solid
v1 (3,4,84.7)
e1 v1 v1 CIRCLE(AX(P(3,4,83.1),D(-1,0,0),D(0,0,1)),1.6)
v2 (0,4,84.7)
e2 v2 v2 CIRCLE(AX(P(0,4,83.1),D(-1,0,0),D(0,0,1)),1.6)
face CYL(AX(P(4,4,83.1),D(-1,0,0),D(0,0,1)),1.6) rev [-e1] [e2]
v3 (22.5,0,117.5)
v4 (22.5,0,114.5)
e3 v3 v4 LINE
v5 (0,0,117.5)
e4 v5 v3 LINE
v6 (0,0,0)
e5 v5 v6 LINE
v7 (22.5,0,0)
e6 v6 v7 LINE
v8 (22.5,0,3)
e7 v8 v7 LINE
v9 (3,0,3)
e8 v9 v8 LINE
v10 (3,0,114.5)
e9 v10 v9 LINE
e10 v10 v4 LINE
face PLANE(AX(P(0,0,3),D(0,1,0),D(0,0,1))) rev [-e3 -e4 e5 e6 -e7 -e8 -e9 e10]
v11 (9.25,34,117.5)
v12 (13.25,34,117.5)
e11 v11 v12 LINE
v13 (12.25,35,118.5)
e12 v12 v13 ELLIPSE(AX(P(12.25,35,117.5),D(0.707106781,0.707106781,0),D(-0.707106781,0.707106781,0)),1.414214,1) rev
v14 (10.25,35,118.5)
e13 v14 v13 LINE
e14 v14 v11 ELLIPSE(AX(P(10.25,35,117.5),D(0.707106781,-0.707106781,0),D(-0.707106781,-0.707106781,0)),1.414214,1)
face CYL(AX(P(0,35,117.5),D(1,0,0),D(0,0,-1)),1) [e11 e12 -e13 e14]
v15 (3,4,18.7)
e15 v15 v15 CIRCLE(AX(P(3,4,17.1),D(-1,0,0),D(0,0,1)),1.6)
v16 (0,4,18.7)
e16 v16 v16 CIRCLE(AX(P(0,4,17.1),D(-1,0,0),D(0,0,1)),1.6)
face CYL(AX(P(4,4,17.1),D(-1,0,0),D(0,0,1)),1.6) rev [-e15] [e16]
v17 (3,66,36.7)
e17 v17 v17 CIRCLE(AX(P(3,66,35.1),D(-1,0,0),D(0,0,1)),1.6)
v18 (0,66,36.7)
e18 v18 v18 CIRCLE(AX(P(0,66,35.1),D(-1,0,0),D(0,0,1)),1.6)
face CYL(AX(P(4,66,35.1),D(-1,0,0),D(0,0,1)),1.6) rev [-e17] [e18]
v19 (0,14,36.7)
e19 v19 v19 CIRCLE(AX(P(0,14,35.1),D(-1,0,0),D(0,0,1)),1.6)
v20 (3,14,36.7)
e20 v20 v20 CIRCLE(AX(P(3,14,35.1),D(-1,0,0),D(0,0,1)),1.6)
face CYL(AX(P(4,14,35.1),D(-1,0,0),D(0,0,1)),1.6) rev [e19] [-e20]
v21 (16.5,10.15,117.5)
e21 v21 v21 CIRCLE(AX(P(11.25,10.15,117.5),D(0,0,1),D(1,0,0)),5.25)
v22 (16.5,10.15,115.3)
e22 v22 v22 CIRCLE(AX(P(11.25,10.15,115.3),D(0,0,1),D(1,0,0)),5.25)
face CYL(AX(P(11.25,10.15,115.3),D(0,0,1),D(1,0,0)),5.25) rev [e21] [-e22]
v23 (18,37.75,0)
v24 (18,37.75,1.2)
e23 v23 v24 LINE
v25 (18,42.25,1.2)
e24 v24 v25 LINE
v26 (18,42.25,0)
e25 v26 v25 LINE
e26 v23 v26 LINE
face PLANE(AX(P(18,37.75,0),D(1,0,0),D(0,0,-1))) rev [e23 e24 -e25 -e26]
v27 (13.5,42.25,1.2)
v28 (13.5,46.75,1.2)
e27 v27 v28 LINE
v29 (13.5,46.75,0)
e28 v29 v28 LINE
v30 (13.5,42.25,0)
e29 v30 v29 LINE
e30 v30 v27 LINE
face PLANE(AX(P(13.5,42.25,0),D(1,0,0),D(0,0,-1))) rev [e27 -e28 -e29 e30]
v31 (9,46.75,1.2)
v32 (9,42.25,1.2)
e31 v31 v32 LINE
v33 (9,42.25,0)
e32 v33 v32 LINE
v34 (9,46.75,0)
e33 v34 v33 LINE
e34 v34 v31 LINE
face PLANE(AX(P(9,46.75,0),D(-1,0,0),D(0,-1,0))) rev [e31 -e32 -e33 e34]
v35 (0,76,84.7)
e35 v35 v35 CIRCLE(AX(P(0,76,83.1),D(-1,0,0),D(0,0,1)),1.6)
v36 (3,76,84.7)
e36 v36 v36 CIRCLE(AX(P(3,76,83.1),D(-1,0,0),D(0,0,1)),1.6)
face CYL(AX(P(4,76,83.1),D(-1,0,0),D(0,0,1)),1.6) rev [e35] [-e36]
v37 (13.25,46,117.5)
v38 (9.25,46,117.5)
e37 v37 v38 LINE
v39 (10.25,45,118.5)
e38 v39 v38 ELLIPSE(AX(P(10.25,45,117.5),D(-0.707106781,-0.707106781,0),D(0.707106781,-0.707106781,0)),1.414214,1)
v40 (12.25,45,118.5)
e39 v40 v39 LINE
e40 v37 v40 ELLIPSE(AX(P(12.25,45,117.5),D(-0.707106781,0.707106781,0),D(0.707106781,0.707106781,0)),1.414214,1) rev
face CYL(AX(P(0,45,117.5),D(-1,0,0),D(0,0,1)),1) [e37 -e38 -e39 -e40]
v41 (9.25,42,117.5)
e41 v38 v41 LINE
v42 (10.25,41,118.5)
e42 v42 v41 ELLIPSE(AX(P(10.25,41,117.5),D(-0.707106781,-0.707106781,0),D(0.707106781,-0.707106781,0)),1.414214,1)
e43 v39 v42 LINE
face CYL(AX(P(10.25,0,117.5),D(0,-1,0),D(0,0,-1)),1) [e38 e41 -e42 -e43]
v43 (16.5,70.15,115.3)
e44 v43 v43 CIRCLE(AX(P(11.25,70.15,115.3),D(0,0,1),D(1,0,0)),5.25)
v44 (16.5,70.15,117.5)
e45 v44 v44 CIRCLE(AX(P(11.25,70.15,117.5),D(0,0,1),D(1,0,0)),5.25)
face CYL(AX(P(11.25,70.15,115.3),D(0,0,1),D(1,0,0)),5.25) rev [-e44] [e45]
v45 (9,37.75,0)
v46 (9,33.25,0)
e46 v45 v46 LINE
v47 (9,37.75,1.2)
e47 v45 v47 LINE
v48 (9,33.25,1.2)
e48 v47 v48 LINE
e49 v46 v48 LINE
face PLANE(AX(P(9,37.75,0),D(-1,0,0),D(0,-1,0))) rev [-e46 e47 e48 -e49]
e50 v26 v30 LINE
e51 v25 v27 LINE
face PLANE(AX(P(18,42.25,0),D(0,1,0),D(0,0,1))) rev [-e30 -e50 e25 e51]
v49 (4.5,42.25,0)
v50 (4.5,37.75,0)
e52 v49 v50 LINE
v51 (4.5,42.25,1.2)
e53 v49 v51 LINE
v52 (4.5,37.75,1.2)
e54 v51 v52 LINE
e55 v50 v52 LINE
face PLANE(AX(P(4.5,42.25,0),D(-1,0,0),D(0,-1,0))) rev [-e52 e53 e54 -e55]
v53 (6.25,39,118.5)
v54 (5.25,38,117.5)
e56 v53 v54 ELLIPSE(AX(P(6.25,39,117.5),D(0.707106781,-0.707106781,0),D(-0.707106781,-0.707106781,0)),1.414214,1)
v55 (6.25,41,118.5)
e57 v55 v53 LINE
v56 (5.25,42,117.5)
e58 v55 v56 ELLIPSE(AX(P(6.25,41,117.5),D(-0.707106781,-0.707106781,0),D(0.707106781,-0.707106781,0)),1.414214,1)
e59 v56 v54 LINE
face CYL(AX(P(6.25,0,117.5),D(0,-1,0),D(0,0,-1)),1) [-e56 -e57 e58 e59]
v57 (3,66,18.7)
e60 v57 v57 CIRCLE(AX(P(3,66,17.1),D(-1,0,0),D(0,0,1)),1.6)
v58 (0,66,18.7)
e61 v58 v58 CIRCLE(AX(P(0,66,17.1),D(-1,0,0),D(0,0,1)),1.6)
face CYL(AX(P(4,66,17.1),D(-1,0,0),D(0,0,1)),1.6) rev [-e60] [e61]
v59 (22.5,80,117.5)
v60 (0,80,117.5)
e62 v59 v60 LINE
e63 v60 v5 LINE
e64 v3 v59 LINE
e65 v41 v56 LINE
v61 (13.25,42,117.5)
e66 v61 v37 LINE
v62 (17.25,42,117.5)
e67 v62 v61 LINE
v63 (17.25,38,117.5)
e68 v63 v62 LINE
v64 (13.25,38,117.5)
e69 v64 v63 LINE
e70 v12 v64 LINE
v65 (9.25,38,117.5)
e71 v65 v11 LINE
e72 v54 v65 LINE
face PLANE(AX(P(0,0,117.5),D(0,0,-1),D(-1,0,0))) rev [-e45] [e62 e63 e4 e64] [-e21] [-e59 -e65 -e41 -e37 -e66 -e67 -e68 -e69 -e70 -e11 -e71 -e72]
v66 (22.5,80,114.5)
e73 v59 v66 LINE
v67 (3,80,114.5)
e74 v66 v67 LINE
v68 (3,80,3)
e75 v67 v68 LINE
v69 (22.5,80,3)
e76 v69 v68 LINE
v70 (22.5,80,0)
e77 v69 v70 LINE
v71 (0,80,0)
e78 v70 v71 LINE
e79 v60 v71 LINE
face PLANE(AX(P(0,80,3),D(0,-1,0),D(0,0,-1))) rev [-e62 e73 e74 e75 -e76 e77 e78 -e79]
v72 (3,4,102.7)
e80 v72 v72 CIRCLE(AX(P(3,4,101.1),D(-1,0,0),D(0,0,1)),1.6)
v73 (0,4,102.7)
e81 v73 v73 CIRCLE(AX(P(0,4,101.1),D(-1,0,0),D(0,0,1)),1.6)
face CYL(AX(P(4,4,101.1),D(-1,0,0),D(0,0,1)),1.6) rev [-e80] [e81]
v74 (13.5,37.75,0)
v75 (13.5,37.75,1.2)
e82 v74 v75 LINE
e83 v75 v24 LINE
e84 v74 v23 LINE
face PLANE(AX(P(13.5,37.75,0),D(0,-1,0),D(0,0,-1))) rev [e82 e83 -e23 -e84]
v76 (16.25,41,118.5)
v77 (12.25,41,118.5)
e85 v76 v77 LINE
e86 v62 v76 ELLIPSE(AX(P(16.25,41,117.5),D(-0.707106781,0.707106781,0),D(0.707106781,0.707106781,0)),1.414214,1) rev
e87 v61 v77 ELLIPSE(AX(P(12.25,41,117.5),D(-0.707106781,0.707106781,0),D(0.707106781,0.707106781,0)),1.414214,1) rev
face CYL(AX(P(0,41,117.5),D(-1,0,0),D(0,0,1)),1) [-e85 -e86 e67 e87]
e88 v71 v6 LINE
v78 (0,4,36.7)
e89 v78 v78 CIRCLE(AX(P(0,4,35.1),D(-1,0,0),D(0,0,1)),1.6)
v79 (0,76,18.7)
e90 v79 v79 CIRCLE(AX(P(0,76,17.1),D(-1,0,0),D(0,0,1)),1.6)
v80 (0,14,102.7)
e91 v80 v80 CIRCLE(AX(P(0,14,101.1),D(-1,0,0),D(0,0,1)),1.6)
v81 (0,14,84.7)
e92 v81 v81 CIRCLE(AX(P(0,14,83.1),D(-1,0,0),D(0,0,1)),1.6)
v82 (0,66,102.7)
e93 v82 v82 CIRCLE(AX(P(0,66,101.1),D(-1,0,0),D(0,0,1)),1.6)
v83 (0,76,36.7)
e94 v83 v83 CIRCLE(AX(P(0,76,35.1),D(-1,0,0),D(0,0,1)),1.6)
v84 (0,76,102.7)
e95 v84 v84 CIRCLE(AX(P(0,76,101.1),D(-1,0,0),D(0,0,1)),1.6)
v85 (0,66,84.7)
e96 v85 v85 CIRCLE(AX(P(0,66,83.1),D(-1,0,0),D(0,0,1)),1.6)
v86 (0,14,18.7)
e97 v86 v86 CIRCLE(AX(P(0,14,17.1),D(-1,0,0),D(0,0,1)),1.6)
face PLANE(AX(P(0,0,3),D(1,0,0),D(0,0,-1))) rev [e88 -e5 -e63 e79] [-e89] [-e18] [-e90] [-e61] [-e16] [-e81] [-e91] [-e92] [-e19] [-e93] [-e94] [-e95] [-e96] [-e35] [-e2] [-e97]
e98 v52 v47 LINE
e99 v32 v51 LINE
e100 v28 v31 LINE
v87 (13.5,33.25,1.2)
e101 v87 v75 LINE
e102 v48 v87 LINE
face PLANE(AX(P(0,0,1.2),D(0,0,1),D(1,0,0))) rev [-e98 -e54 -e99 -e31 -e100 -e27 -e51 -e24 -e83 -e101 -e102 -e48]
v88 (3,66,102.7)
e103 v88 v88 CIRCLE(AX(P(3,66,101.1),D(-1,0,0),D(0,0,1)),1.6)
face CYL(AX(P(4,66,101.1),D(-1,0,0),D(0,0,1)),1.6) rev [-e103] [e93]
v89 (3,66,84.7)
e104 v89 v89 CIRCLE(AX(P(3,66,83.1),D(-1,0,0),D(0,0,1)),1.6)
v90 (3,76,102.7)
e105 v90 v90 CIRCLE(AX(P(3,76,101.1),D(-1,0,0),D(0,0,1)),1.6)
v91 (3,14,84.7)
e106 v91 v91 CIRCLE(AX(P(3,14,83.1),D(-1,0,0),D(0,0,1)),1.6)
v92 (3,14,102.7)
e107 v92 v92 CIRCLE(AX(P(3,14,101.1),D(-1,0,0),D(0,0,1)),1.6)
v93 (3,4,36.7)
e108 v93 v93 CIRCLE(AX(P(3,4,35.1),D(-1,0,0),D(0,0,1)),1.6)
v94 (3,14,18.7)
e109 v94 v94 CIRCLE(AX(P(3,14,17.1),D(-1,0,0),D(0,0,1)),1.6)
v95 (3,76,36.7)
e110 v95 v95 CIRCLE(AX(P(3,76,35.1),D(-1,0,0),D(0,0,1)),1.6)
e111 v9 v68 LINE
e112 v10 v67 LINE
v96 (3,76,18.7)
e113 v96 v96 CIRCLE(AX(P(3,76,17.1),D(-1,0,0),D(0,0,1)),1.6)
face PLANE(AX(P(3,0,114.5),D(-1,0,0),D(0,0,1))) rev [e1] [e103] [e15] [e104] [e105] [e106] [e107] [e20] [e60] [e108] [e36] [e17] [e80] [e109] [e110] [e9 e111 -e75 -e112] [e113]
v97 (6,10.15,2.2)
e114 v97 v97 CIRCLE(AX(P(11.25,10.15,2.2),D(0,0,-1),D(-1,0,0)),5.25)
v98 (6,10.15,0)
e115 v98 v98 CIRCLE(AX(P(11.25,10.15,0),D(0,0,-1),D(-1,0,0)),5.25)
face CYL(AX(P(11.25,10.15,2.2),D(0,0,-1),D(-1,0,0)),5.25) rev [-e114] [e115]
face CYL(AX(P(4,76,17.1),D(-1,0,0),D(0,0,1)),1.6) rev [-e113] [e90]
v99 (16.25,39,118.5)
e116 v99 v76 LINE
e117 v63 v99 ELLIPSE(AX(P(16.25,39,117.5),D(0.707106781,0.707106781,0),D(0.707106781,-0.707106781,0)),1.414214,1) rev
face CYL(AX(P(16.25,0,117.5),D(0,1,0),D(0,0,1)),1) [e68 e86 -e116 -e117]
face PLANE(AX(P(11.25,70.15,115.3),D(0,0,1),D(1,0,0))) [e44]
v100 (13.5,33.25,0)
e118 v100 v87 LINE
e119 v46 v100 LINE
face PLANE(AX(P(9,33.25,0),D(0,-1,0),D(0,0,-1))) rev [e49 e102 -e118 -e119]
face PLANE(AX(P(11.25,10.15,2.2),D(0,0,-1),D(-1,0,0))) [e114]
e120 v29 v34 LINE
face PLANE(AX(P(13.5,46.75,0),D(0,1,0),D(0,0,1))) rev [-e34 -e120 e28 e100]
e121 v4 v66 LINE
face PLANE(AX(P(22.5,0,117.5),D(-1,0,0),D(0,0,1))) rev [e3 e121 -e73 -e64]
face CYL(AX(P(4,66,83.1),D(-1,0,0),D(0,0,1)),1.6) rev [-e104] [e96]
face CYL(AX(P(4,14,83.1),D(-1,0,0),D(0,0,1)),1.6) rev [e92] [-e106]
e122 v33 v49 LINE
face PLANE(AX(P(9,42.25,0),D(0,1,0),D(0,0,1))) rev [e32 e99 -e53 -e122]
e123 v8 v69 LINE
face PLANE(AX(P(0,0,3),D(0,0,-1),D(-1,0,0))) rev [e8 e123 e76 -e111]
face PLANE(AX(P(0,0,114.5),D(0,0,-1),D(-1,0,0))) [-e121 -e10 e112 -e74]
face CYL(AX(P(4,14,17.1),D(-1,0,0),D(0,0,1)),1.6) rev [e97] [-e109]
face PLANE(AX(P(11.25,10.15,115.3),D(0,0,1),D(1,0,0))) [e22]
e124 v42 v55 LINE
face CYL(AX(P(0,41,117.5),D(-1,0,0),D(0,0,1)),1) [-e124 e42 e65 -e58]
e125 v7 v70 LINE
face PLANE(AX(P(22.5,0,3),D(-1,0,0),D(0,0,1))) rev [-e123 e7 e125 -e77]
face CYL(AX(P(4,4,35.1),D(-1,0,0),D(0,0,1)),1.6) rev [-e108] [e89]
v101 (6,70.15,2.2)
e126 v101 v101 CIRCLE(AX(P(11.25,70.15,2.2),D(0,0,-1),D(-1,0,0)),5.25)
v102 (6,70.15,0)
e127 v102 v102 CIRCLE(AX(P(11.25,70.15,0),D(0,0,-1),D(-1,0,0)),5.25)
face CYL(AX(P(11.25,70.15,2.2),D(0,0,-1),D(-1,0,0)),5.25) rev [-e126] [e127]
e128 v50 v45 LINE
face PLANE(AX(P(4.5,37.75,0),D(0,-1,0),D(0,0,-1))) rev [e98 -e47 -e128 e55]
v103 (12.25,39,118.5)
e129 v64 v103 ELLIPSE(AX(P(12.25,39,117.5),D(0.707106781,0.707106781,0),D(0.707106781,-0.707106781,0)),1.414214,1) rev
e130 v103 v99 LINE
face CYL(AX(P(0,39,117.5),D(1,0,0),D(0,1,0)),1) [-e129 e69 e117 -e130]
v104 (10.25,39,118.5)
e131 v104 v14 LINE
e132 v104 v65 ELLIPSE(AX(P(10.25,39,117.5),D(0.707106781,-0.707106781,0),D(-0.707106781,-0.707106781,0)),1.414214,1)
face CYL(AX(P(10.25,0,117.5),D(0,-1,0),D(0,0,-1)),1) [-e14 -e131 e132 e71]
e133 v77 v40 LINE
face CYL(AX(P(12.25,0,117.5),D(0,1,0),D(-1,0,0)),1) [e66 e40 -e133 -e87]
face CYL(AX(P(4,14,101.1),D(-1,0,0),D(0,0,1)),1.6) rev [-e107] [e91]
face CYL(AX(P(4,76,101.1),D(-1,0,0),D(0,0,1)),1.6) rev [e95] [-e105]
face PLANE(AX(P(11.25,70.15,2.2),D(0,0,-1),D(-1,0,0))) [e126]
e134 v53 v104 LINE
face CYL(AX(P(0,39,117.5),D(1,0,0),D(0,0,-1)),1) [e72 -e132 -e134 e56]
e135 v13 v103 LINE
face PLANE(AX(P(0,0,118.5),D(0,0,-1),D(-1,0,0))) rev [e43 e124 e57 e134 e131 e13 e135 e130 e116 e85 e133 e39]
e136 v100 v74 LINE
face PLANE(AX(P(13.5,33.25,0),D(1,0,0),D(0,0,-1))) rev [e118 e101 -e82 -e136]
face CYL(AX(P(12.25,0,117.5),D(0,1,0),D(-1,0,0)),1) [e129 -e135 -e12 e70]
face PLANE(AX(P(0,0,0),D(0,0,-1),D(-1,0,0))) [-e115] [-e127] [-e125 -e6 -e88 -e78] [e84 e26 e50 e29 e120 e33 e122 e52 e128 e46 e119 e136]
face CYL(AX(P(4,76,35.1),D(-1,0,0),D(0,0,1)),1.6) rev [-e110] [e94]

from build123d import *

# Parameters (mm, degrees)
ESQUISSE1_W             = 22.5
ESQUISSE1_H             = 80
BOSS_EXTRU_1_DEPTH      = 3
ESQUISSE2_W             = 3
ESQUISSE2_H             = 80
BOSS_EXTRU_2_DEPTH      = 111.5
ESQUISSE3_W             = 22.5
ESQUISSE3_H             = 80
BOSS_EXTRU_3_DEPTH      = 3
ESQUISSE4_R             = 5.25
ENL_V_MAT_EXTRU_1_DEPTH = 2.2
ENL_V_START             = -1.8
ENL_V_MAT_EXTRU_2_DEPTH = 1.2
ENL_V_START_2           = -2.2
ESQUISSE6_R             = 5.25
ENL_V_MAT_EXTRU_3_DEPTH = 2.2
BOSS_EXTRU_4_DEPTH      = 1
ESQUISSE8_R             = 1.6
ENL_V_MAT_EXTRU_4_DEPTH = 4
CONG_2_R                = 1


with BuildPart() as part:
    # Esquisse1 → Boss.-Extru.1 (new body)
    with BuildSketch(Plane.XY):
        with Locations((11.25, 40)):
            Rectangle(ESQUISSE1_W, ESQUISSE1_H)
    extrude(amount=BOSS_EXTRU_1_DEPTH)

    # Esquisse2 → Boss.-Extru.2 (add)
    with BuildSketch(Plane.XY.offset(3)):
        with Locations((1.5, 40)):
            Rectangle(ESQUISSE2_W, ESQUISSE2_H)
    extrude(amount=BOSS_EXTRU_2_DEPTH)

    # Esquisse3 → Boss.-Extru.3 (add)
    with BuildSketch(Plane.XY.offset(114.5)):
        with Locations((11.25, 40)):
            Rectangle(ESQUISSE3_W, ESQUISSE3_H)
    extrude(amount=BOSS_EXTRU_3_DEPTH)

    # Esquisse4 → Enlèv. mat.-Extru.1 (cut)
    with BuildSketch(Plane(origin=(0, 0, 0), x_dir=(-1, 0, 0), z_dir=(0, 0, -1))):
        with Locations((-11.25, 10.15)):
            Circle(ESQUISSE4_R)
        with Locations((-11.25, 70.15)):
            Circle(ESQUISSE4_R)
    extrude(amount=-ENL_V_MAT_EXTRU_1_DEPTH, mode=Mode.SUBTRACT)

    # Esquisse5 → Enlèv. mat.-Extru.2 (cut)
    with BuildSketch(Plane.XY.offset(3).offset(ENL_V_START)):
        Polygon((4.5, 37.75), (9, 37.75), (9, 33.25), (13.5, 33.25), (13.5, 37.75), (18, 37.75), (18, 42.25), (13.5, 42.25), (13.5, 46.75), (9, 46.75), (9, 42.25), (4.5, 42.25), align=None)
    extrude(amount=-ENL_V_MAT_EXTRU_2_DEPTH, mode=Mode.SUBTRACT)

    # Esquisse6 → Enlèv. mat.-Extru.3 (cut)
    with BuildSketch(Plane.XY.offset(117.5).offset(ENL_V_START_2)):
        with Locations(Location((11.25, 10.15, 0), (0, 0, 180))):
            Circle(ESQUISSE6_R)
        with Locations(Location((11.25, 70.15, 0), (0, 0, 180))):
            Circle(ESQUISSE6_R)
    extrude(amount=ENL_V_MAT_EXTRU_3_DEPTH, mode=Mode.SUBTRACT)

    # Esquisse7 → Boss.-Extru.4 (add)
    with BuildSketch(Plane.XY.offset(117.5)):
        Polygon((5.25, 42), (9.25, 42), (9.25, 46), (13.25, 46), (13.25, 42), (17.25, 42), (17.25, 38), (13.25, 38), (13.25, 34), (9.25, 34), (9.25, 38), (5.25, 38), align=None)
    extrude(amount=BOSS_EXTRU_4_DEPTH)

    # Esquisse8 → Enlèv. mat.-Extru.4 (cut)
    with BuildSketch(Plane.ZY):
        with Locations((35.1, 76)):
            Circle(ESQUISSE8_R)
        with Locations((35.1, 66)):
            Circle(ESQUISSE8_R)
        with Locations((17.1, 76)):
            Circle(ESQUISSE8_R)
        with Locations((17.1, 66)):
            Circle(ESQUISSE8_R)
        with Locations((17.1, 4)):
            Circle(ESQUISSE8_R)
        with Locations((17.1, 14)):
            Circle(ESQUISSE8_R)
        with Locations((35.1, 14)):
            Circle(ESQUISSE8_R)
        with Locations((35.1, 4)):
            Circle(ESQUISSE8_R)
        with Locations((83.1, 76)):
            Circle(ESQUISSE8_R)
        with Locations((83.1, 66)):
            Circle(ESQUISSE8_R)
        with Locations((101.1, 76)):
            Circle(ESQUISSE8_R)
        with Locations((101.1, 66)):
            Circle(ESQUISSE8_R)
        with Locations((83.1, 14)):
            Circle(ESQUISSE8_R)
        with Locations((83.1, 4)):
            Circle(ESQUISSE8_R)
        with Locations((101.1, 4)):
            Circle(ESQUISSE8_R)
        with Locations((101.1, 14)):
            Circle(ESQUISSE8_R)
    extrude(amount=-ENL_V_MAT_EXTRU_4_DEPTH, mode=Mode.SUBTRACT)

    # Congé2
    cong_2_edges = [part.edges().sort_by_distance(p)[0] for p in [
        (11.25, 46, 118.5),
        (9.25, 44, 118.5),
        (13.25, 44, 118.5),
        (15.25, 42, 118.5),
        (17.25, 40, 118.5),
        (15.25, 38, 118.5),
        (13.25, 36, 118.5),
        (9.25, 36, 118.5),
        (7.25, 38, 118.5),
        (7.25, 42, 118.5),
        (5.25, 40, 118.5),
        (11.25, 34, 118.5),
    ]]
    fillet(cong_2_edges, radius=CONG_2_R - 0.0001)  # a hair under: the kernel refuses the full size


solid = part.part
